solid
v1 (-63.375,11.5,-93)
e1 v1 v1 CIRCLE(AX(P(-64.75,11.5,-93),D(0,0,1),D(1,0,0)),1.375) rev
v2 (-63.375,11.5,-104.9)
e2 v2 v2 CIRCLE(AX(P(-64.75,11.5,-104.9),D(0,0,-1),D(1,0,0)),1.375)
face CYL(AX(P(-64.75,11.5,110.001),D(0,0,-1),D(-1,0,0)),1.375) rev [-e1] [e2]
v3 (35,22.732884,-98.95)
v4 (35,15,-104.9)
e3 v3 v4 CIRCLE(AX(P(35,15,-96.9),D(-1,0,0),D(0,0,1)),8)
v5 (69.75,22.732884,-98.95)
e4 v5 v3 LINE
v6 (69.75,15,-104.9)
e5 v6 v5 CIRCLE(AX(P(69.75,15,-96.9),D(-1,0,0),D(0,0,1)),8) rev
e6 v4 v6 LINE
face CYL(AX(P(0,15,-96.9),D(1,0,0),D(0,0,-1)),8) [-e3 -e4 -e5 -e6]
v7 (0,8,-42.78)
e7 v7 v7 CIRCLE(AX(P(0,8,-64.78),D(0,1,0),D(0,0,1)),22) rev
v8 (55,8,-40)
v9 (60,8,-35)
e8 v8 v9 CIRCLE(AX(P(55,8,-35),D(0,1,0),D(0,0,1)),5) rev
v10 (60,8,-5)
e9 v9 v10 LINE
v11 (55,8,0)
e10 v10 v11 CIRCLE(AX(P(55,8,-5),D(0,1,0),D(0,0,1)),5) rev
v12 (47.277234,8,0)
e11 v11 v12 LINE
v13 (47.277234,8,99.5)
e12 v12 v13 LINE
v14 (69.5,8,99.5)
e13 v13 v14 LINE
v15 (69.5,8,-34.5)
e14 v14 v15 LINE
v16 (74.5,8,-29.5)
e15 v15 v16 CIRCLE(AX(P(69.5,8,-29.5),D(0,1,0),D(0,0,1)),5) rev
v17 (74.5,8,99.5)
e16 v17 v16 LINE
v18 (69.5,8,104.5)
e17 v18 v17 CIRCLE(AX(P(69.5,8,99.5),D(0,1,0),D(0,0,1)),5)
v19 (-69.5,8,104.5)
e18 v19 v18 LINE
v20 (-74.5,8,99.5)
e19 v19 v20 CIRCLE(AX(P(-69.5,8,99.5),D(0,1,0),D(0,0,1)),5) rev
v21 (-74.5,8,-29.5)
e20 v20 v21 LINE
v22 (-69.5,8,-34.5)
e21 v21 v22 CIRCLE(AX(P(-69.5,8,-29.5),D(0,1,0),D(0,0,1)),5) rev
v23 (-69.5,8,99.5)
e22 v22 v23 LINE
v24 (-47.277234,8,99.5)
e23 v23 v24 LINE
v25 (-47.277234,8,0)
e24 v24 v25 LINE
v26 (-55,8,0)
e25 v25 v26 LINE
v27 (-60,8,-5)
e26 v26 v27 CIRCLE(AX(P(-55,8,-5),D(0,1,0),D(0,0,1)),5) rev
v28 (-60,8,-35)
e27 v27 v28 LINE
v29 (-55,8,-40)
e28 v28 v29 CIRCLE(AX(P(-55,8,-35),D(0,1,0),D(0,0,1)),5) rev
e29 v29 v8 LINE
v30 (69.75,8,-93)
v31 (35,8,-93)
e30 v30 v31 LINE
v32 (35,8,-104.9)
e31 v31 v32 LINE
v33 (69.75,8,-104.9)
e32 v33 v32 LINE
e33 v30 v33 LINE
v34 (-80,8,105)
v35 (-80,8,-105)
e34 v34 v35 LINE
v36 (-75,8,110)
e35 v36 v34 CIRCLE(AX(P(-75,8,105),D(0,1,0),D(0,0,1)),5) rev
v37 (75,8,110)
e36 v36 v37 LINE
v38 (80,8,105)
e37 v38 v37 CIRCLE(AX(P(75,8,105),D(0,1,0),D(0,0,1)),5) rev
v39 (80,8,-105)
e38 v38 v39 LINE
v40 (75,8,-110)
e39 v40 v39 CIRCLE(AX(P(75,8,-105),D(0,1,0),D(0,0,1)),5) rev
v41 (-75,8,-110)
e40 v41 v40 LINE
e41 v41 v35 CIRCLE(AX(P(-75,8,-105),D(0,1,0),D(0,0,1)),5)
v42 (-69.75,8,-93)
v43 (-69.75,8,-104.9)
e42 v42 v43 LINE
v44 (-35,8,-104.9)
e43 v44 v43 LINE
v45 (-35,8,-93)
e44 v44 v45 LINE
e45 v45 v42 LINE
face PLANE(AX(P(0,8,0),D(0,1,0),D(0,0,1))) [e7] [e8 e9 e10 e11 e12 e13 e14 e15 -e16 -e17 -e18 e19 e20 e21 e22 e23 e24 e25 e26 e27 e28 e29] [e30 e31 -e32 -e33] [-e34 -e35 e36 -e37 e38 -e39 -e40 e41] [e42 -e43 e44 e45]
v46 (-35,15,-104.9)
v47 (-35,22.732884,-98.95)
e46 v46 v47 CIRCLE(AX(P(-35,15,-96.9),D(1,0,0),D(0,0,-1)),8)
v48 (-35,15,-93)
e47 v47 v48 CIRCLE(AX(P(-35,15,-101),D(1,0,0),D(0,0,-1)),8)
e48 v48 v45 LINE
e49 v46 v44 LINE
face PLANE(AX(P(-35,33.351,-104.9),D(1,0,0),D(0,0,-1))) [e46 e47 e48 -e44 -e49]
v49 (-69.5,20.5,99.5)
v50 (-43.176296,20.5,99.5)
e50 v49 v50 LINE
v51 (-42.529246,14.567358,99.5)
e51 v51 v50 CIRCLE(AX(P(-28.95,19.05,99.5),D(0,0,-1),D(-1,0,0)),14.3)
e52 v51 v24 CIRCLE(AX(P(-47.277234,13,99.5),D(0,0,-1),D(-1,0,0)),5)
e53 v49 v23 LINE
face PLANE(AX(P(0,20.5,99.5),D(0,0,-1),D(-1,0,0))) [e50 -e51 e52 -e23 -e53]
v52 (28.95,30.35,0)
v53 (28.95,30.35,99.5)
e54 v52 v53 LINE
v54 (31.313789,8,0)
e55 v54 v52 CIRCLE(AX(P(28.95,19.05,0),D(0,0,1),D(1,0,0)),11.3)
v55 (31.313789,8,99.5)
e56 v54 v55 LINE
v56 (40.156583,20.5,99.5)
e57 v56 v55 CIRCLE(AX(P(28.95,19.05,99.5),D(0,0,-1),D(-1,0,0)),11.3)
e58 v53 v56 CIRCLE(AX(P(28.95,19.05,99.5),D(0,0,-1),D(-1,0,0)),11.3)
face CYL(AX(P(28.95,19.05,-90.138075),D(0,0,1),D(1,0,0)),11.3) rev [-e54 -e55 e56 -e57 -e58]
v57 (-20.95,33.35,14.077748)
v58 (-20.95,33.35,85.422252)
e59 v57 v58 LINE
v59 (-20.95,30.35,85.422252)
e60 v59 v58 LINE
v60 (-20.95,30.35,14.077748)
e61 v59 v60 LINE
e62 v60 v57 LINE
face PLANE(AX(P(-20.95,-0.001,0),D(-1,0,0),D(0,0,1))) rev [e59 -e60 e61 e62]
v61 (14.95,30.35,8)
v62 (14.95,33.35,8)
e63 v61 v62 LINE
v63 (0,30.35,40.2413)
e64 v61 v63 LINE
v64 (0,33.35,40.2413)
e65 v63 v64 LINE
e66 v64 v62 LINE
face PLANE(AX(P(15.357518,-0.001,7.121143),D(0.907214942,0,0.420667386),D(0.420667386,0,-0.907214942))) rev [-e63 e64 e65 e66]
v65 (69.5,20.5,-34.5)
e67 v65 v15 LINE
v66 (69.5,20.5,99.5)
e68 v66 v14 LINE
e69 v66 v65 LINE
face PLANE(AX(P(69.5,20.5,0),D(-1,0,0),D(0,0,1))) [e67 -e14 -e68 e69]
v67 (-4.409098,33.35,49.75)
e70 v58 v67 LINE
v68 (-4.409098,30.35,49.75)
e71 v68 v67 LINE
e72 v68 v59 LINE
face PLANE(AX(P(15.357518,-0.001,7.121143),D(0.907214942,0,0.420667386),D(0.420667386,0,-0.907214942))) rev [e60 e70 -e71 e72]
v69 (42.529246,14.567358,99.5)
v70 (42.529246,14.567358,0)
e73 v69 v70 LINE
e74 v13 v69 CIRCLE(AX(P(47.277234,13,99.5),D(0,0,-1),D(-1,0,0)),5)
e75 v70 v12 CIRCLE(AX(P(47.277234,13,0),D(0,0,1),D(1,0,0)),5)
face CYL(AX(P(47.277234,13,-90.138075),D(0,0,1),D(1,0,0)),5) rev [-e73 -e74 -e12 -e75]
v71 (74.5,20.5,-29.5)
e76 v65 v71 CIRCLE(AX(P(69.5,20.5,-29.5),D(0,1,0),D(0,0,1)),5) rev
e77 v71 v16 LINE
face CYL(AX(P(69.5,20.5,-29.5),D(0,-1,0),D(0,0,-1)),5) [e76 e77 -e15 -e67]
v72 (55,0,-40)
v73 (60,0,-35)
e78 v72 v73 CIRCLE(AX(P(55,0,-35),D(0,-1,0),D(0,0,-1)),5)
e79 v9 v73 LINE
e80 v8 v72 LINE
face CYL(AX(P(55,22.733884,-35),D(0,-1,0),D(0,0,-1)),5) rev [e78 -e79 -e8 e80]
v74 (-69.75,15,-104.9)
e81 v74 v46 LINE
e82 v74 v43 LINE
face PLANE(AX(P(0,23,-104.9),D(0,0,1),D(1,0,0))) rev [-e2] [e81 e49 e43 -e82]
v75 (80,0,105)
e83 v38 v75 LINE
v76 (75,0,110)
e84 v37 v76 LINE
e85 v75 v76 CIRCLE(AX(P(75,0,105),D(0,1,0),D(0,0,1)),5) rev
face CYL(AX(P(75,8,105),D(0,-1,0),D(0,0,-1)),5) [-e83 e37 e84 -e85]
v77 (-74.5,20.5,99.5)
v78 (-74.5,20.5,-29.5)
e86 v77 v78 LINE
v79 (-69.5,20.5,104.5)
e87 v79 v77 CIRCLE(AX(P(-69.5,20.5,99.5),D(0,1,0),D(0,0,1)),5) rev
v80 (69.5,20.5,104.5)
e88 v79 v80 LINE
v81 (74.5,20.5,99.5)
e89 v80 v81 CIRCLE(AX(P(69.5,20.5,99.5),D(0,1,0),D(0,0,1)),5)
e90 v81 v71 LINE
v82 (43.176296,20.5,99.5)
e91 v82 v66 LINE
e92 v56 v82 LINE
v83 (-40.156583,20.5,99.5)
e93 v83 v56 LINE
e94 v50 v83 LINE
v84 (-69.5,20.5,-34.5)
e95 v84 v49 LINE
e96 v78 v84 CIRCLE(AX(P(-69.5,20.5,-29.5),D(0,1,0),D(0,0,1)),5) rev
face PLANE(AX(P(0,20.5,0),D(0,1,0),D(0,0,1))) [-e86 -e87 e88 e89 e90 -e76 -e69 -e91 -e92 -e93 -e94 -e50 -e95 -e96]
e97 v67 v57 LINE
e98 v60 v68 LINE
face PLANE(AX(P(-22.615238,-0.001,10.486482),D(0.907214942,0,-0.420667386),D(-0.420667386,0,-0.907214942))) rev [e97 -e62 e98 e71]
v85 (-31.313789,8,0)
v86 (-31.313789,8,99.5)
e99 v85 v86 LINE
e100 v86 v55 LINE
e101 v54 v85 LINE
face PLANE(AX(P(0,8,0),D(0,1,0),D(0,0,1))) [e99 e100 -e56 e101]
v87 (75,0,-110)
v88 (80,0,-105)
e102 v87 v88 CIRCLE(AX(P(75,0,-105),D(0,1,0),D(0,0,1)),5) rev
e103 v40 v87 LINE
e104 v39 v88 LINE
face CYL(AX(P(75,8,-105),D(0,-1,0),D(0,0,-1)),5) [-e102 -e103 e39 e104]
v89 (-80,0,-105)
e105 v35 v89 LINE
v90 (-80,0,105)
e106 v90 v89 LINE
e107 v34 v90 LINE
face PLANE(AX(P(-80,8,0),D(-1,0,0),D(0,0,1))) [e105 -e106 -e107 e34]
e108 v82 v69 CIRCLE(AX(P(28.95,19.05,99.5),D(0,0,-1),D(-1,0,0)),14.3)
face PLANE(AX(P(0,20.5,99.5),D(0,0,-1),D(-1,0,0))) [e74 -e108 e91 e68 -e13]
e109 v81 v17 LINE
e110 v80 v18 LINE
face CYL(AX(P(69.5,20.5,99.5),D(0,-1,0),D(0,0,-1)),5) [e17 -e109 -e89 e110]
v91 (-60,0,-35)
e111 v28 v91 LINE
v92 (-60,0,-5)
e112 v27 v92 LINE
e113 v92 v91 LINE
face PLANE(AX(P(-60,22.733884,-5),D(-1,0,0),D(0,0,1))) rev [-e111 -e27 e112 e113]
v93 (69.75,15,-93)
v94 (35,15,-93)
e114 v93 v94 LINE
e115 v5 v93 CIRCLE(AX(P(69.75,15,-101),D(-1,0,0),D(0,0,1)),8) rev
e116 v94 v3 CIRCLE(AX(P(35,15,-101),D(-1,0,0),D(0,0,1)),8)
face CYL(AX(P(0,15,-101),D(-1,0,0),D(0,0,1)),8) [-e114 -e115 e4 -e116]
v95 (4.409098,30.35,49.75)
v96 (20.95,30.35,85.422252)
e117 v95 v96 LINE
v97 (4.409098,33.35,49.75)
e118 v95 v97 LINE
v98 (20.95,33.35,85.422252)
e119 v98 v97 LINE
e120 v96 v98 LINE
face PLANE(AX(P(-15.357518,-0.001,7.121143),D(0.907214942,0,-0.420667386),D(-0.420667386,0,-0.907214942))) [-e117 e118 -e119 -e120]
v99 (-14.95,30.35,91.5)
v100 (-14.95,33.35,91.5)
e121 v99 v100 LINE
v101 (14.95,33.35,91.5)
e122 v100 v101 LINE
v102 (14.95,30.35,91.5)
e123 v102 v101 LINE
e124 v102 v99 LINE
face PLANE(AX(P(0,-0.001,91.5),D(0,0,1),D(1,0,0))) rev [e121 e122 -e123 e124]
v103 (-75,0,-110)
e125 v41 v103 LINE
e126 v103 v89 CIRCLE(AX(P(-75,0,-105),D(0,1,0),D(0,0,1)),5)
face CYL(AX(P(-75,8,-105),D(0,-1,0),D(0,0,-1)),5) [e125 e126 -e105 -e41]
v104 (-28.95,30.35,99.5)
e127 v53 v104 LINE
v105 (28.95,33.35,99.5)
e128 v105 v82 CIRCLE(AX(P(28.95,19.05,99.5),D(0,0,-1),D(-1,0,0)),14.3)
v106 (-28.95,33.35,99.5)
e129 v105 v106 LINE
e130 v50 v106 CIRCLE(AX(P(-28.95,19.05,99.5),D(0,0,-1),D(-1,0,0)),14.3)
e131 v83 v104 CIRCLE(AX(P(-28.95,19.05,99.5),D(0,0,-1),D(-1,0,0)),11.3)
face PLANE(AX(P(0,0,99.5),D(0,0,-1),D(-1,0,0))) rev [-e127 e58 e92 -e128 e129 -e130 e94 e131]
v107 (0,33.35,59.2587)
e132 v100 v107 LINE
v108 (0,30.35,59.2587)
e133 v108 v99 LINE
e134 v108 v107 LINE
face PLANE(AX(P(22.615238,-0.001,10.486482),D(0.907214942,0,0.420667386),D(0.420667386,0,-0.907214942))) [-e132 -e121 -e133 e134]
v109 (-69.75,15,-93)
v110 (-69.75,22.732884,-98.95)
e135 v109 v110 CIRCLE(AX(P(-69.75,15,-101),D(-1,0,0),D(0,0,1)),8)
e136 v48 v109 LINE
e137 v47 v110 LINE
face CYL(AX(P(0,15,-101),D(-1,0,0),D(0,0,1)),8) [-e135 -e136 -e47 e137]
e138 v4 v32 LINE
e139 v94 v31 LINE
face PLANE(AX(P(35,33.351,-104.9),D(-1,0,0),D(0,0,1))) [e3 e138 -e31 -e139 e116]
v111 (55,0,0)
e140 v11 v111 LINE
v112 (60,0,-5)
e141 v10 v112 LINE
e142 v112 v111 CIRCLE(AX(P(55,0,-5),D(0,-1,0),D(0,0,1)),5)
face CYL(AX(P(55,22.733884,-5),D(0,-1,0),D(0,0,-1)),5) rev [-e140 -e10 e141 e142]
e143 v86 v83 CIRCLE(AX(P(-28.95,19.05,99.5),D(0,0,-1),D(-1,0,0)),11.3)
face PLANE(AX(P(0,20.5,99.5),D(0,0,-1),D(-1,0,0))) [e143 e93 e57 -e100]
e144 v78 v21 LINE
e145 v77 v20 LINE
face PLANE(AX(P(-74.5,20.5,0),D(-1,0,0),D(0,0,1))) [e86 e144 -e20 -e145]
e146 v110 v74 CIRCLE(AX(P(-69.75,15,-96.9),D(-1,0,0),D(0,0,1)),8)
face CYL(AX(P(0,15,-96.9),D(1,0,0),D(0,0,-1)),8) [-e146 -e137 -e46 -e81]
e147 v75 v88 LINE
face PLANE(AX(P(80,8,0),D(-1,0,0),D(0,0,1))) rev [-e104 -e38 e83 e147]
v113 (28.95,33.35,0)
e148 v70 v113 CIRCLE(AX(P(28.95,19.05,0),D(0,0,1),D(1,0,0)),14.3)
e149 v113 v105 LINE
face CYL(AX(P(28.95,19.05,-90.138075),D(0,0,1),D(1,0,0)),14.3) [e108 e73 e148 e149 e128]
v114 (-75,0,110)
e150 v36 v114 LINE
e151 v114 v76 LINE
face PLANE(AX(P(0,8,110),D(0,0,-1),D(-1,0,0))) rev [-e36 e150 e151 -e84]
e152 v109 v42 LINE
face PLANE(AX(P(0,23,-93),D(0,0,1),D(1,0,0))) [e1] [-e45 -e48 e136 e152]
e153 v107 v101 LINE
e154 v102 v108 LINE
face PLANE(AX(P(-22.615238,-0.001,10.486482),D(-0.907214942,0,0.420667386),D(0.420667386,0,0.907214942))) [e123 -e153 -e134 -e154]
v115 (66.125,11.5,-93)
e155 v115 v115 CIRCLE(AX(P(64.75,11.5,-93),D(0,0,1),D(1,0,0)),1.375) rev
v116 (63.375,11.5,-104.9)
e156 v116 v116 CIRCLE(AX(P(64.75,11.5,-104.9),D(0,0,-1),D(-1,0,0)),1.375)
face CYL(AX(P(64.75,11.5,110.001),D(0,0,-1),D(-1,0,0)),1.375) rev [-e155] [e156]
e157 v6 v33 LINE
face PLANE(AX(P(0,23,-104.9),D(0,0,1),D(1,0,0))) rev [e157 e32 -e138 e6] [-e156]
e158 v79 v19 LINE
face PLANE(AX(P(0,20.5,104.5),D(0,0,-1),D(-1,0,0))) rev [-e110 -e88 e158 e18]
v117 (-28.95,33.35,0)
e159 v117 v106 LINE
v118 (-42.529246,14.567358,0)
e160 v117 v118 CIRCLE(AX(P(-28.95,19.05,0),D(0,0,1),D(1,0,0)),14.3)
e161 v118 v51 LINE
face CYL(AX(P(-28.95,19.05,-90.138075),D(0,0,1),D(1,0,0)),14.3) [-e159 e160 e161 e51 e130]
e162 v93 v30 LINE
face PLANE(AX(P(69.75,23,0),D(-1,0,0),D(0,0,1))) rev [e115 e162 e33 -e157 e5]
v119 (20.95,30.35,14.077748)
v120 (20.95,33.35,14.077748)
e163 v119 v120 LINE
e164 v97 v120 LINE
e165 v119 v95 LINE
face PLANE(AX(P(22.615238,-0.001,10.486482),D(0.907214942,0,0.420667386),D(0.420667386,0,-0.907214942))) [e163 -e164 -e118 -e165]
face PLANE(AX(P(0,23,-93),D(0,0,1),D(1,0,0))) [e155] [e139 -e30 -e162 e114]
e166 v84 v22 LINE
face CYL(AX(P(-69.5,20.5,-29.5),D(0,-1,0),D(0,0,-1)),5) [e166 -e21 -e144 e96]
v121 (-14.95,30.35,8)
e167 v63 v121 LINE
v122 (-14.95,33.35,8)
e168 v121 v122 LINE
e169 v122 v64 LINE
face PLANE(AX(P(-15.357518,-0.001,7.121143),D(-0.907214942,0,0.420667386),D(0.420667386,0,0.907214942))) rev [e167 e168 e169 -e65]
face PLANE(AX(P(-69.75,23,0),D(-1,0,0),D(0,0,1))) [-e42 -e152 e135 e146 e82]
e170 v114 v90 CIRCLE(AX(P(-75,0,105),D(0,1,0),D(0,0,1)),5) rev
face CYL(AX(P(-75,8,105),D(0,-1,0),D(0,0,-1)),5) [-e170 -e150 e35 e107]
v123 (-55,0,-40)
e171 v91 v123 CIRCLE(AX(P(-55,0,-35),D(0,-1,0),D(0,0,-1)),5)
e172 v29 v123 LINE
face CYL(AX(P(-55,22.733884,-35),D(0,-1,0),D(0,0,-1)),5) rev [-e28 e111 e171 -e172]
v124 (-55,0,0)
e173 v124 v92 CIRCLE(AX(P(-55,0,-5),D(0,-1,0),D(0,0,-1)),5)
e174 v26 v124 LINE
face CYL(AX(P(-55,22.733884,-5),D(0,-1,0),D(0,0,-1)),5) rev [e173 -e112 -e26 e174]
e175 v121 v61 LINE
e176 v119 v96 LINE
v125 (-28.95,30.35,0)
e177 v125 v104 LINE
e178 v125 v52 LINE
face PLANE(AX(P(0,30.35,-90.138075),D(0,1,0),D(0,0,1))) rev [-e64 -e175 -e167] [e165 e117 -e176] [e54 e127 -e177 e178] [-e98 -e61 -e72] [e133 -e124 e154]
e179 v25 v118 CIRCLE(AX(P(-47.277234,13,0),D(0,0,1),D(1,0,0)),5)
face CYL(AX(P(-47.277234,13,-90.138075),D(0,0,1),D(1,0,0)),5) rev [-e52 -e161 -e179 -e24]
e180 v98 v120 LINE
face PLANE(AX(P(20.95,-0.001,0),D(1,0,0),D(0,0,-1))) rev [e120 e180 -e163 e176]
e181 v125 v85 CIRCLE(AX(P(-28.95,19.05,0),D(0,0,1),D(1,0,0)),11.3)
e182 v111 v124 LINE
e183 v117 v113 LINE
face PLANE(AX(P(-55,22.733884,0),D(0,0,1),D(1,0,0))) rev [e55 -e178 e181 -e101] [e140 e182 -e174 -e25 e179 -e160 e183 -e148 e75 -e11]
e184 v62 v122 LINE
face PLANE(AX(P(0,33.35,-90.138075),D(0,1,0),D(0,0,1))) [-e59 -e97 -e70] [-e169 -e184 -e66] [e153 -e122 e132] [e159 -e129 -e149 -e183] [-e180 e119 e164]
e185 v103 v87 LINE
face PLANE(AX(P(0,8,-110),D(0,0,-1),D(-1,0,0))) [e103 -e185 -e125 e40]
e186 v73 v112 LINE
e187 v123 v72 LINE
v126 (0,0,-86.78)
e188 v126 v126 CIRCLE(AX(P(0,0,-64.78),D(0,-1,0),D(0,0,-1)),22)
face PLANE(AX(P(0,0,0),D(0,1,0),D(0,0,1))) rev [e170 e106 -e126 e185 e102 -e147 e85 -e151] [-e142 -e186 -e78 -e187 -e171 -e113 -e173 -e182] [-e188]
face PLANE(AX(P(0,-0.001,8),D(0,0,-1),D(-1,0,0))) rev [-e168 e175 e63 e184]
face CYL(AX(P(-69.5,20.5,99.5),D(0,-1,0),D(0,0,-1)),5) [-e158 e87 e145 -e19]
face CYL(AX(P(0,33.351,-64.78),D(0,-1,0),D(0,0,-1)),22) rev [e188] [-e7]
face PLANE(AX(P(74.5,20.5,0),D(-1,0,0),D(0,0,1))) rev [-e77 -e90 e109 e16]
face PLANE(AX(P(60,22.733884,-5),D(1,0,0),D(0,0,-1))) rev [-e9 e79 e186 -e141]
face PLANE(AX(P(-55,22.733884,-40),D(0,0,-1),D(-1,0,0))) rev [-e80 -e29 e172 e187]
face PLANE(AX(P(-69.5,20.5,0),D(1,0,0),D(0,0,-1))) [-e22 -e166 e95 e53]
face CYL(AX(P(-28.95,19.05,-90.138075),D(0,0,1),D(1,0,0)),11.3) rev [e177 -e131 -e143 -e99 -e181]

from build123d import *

# Parameters (mm, degrees)
BOSS_EXTRUDE1_DEPTH = 8
BOSS_EXTRUDE2_START = 8
SKETCH3_7_W         = 139.5
SKETCH3_7_H         = 11.9
BOSS_EXTRUDE2_DEPTH = 15
FILLET1_R           = 8
CUT_EXTRUDE1_REACH  = 139.901
BOSS_EXTRUDE3_DEPTH = 12.5
CUT_EXTRUDE2_REACH  = 232.432
SKETCH6_R           = 1.375
BOSS_EXTRUDE4_DEPTH = 99.5
FILLET2_R           = 5
CUT_EXTRUDE3_REACH  = 140.357
SKETCH9_W           = 70
SKETCH9_H           = 11.9
CUT_EXTRUDE4_REACH  = 142.044
CUT_EXTRUDE5_REACH  = 142.044
SKETCH11_R          = 22


with BuildPart() as part:
    # Sketch3 → Boss-Extrude1 (new body)
    with BuildSketch(Plane(origin=(0, 0, 0), x_dir=(1, 0, 0), z_dir=(0, 1, 0))):
        with BuildLine():
            Line((-75, 110), (75, 110))
            ThreePointArc((75, 110), (78.535533906, 108.535533906), (80, 105))
            Line((80, 105), (80, -105))
            ThreePointArc((80, -105), (78.535533906, -108.535533906), (75, -110))
            Line((75, -110), (-75, -110))
            ThreePointArc((-75, -110), (-78.535533906, -108.535533906), (-80, -105))
            Line((-80, -105), (-80, 105))
            ThreePointArc((-80, 105), (-78.535533906, 108.535533906), (-75, 110))
        make_face()
    extrude(amount=BOSS_EXTRUDE1_DEPTH)

    # Sketch3<7> → Boss-Extrude2 (add)
    with BuildSketch(Plane(origin=(0, 0, 0), x_dir=(1, 0, 0), z_dir=(0, 1, 0)).offset(BOSS_EXTRUDE2_START)):
        with Locations((0, 98.95)):
            Rectangle(SKETCH3_7_W, SKETCH3_7_H)
    extrude(amount=BOSS_EXTRUDE2_DEPTH)

    # Fillet1
    # the kernel refuses this fillet: 8 mm, written as the material it takes off along each edge
    with BuildSketch(Plane(origin=(89.75, 23, -93), x_dir=(0, -1, 0), z_dir=(-1, 0, 0)), Plane(origin=(-89.75, 23, -104.9), x_dir=(0, -1, 0), z_dir=(1, 0, 0))) as fillet1_piece_1:
        with BuildLine():
            CenterArc((FILLET1_R, -FILLET1_R), FILLET1_R, 90, 90)
            Line((0, -FILLET1_R), (0, 0))
            Line((0, 0), (FILLET1_R, 0))
        make_face()
    extrude(amount=179.5, mode=Mode.SUBTRACT)

    # Sketch4 → Cut-Extrude1 (cut, up to next)
    with BuildSketch(Plane.XZ, mode=Mode.PRIVATE) as cut_extrude1_sk1:
        with BuildLine():
            Line((-55, 0), (55, 0))
            ThreePointArc((55, 0), (58.535533906, -1.464466094), (60, -5))
            Line((60, -5), (60, -35))
            ThreePointArc((60, -35), (58.535533906, -38.535533906), (55, -40))
            Line((55, -40), (-55, -40))
            ThreePointArc((-55, -40), (-58.535533906, -38.535533906), (-60, -35))
            Line((-60, -35), (-60, -5))
            ThreePointArc((-60, -5), (-58.535533906, -1.464466094), (-55, 0))
        make_face()
    cut_extrude1_tool1 = extrude(cut_extrude1_sk1.sketch, amount=-CUT_EXTRUDE1_REACH, mode=Mode.PRIVATE) & part.part
    add(cut_extrude1_tool1.solids().sort_by_distance((0, 0, -20))[0], mode=Mode.SUBTRACT)

    # Sketch5 → Boss-Extrude3 (add)
    with BuildSketch(Plane(origin=(0, 8, 0), x_dir=(1, 0, 0), z_dir=(0, 1, 0))):
        with BuildLine():
            ThreePointArc((-69.5, -104.5), (-73.035533906, -103.035533906), (-74.5, -99.5))
            Line((-74.5, -99.5), (-74.5, 29.5))
            ThreePointArc((-74.5, 29.5), (-73.035533906, 33.035533906), (-69.5, 34.5))
            Line((-69.5, 34.5), (-69.5, -99.5))
            Line((-69.5, -99.5), (69.5, -99.5))
            Line((69.5, -99.5), (69.5, 34.5))
            ThreePointArc((69.5, 34.5), (73.035533906, 33.035533906), (74.5, 29.5))
            Line((74.5, 29.5), (74.5, -99.5))
            ThreePointArc((74.5, -99.5), (73.035533906, -103.035533906), (69.5, -104.5))
            Line((69.5, -104.5), (-69.5, -104.5))
        make_face()
    extrude(amount=BOSS_EXTRUDE3_DEPTH)

    # Sketch6 → Cut-Extrude2 (cut, up to next)
    with BuildSketch(Plane(origin=(0, 0, -104.9), x_dir=(-1, 0, 0), z_dir=(0, 0, -1)), mode=Mode.PRIVATE) as cut_extrude2_sk1:
        with Locations((-64.75, 11.5)):
            Circle(SKETCH6_R)
    cut_extrude2_tool1 = extrude(cut_extrude2_sk1.sketch, amount=-CUT_EXTRUDE2_REACH, mode=Mode.PRIVATE) & part.part
    # Sketch6 → Cut-Extrude2 (cut, up to next)
    with BuildSketch(Plane(origin=(0, 0, -104.9), x_dir=(-1, 0, 0), z_dir=(0, 0, -1)), mode=Mode.PRIVATE) as cut_extrude2_sk2:
        with Locations(Location((64.75, 11.5, 0), (0, 0, 180))):
            Circle(SKETCH6_R)
    cut_extrude2_tool2 = extrude(cut_extrude2_sk2.sketch, amount=-CUT_EXTRUDE2_REACH, mode=Mode.PRIVATE) & part.part
    add(cut_extrude2_tool1.solids().sort_by_distance((64.75, 11.5, -104.9))[0], mode=Mode.SUBTRACT)
    add(cut_extrude2_tool2.solids().sort_by_distance((-64.75, 11.5, -104.9))[0], mode=Mode.SUBTRACT)

    # Sketch8 → Boss-Extrude4 (add)
    with BuildSketch(Plane(origin=(0, 0, 99.5), x_dir=(-1, 0, 0), z_dir=(0, 0, -1))):
        with BuildLine():
            Line((-38.026756028, 8), (-31.313789331, 8))
            ThreePointArc((-31.313789331, 8), (-40.187326194, 20.238486432), (-28.95, 30.35))
            Line((-28.95, 30.35), (28.95, 30.35))
            ThreePointArc((28.95, 30.35), (40.187326194, 20.238486432), (31.313789331, 8))
            Line((31.313789331, 8), (38.026756028, 8))
            ThreePointArc((38.026756028, 8), (42.413004865, 23.870529017), (28.95, 33.35))
            Line((28.95, 33.35), (-28.95, 33.35))
            ThreePointArc((-28.95, 33.35), (-42.413004865, 23.870529017), (-38.026756028, 8))
        make_face()
    extrude(amount=BOSS_EXTRUDE4_DEPTH)

    # Fillet2
    fillet2_edges = [part.edges().sort_by_distance(p)[0] for p in [
        (-38.026756028, 8, 49.75),
        (38.026756028, 8, 49.75),
    ]]
    fillet(fillet2_edges, radius=FILLET2_R)

    # Sketch9 → Cut-Extrude3 (cut, up to next)
    with BuildSketch(Plane(origin=(0, 8, 0), x_dir=(1, 0, 0), z_dir=(0, 1, 0)), mode=Mode.PRIVATE) as cut_extrude3_sk1:
        with Locations((0, 98.95)):
            Rectangle(SKETCH9_W, SKETCH9_H)
    cut_extrude3_tool1 = extrude(cut_extrude3_sk1.sketch, amount=CUT_EXTRUDE3_REACH, mode=Mode.PRIVATE) & part.part
    add(cut_extrude3_tool1.solids().sort_by_distance((0, 8, -98.95))[0], mode=Mode.SUBTRACT)

    # Sketch10 → Cut-Extrude4 (cut, up to next)
    with BuildSketch(Plane(origin=(0, 33.35, 0), x_dir=(1, 0, 0), z_dir=(0, 1, 0)), mode=Mode.PRIVATE) as cut_extrude4_sk1:
        Polygon((4.409098458, -49.75), (20.95, -85.422252035), (20.95, -14.077747965), align=None)
    cut_extrude4_tool1 = extrude(cut_extrude4_sk1.sketch, amount=-CUT_EXTRUDE4_REACH, mode=Mode.PRIVATE) & part.part
    # Sketch10 → Cut-Extrude4 (cut, up to next)
    with BuildSketch(Plane(origin=(0, 33.35, 0), x_dir=(1, 0, 0), z_dir=(0, 1, 0)), mode=Mode.PRIVATE) as cut_extrude4_sk2:
        Polygon((0, -59.258700058), (-14.95, -91.5), (14.95, -91.5), align=None)
    cut_extrude4_tool2 = extrude(cut_extrude4_sk2.sketch, amount=-CUT_EXTRUDE4_REACH, mode=Mode.PRIVATE) & part.part
    # Sketch10 → Cut-Extrude4 (cut, up to next)
    with BuildSketch(Plane(origin=(0, 33.35, 0), x_dir=(1, 0, 0), z_dir=(0, 1, 0)), mode=Mode.PRIVATE) as cut_extrude4_sk3:
        Polygon((14.95, -8), (-14.95, -8), (0, -40.241299942), align=None)
    cut_extrude4_tool3 = extrude(cut_extrude4_sk3.sketch, amount=-CUT_EXTRUDE4_REACH, mode=Mode.PRIVATE) & part.part
    # Sketch10 → Cut-Extrude4 (cut, up to next)
    with BuildSketch(Plane(origin=(0, 33.35, 0), x_dir=(1, 0, 0), z_dir=(0, 1, 0)), mode=Mode.PRIVATE) as cut_extrude4_sk4:
        Polygon((-20.95, -14.077747965), (-20.95, -85.422252035), (-4.409098458, -49.75), align=None)
    cut_extrude4_tool4 = extrude(cut_extrude4_sk4.sketch, amount=-CUT_EXTRUDE4_REACH, mode=Mode.PRIVATE) & part.part
    add(cut_extrude4_tool1.solids().sort_by_distance((15.436366, 33.35, 49.75))[0], mode=Mode.SUBTRACT)
    add(cut_extrude4_tool2.solids().sort_by_distance((0, 33.35, 80.7529))[0], mode=Mode.SUBTRACT)
    add(cut_extrude4_tool3.solids().sort_by_distance((0, 33.35, 18.7471))[0], mode=Mode.SUBTRACT)
    add(cut_extrude4_tool4.solids().sort_by_distance((-15.436366, 33.35, 49.75))[0], mode=Mode.SUBTRACT)

    # Sketch11 → Cut-Extrude5 (cut, up to next)
    with BuildSketch(Plane.XZ, mode=Mode.PRIVATE) as cut_extrude5_sk1:
        with Locations(Location((0, -64.78, 0), (0, 0, 270))):
            Circle(SKETCH11_R)
    cut_extrude5_tool1 = extrude(cut_extrude5_sk1.sketch, amount=-CUT_EXTRUDE5_REACH, mode=Mode.PRIVATE) & part.part
    add(cut_extrude5_tool1.solids().sort_by_distance((0, 0, -64.78))[0], mode=Mode.SUBTRACT)


solid = part.part
